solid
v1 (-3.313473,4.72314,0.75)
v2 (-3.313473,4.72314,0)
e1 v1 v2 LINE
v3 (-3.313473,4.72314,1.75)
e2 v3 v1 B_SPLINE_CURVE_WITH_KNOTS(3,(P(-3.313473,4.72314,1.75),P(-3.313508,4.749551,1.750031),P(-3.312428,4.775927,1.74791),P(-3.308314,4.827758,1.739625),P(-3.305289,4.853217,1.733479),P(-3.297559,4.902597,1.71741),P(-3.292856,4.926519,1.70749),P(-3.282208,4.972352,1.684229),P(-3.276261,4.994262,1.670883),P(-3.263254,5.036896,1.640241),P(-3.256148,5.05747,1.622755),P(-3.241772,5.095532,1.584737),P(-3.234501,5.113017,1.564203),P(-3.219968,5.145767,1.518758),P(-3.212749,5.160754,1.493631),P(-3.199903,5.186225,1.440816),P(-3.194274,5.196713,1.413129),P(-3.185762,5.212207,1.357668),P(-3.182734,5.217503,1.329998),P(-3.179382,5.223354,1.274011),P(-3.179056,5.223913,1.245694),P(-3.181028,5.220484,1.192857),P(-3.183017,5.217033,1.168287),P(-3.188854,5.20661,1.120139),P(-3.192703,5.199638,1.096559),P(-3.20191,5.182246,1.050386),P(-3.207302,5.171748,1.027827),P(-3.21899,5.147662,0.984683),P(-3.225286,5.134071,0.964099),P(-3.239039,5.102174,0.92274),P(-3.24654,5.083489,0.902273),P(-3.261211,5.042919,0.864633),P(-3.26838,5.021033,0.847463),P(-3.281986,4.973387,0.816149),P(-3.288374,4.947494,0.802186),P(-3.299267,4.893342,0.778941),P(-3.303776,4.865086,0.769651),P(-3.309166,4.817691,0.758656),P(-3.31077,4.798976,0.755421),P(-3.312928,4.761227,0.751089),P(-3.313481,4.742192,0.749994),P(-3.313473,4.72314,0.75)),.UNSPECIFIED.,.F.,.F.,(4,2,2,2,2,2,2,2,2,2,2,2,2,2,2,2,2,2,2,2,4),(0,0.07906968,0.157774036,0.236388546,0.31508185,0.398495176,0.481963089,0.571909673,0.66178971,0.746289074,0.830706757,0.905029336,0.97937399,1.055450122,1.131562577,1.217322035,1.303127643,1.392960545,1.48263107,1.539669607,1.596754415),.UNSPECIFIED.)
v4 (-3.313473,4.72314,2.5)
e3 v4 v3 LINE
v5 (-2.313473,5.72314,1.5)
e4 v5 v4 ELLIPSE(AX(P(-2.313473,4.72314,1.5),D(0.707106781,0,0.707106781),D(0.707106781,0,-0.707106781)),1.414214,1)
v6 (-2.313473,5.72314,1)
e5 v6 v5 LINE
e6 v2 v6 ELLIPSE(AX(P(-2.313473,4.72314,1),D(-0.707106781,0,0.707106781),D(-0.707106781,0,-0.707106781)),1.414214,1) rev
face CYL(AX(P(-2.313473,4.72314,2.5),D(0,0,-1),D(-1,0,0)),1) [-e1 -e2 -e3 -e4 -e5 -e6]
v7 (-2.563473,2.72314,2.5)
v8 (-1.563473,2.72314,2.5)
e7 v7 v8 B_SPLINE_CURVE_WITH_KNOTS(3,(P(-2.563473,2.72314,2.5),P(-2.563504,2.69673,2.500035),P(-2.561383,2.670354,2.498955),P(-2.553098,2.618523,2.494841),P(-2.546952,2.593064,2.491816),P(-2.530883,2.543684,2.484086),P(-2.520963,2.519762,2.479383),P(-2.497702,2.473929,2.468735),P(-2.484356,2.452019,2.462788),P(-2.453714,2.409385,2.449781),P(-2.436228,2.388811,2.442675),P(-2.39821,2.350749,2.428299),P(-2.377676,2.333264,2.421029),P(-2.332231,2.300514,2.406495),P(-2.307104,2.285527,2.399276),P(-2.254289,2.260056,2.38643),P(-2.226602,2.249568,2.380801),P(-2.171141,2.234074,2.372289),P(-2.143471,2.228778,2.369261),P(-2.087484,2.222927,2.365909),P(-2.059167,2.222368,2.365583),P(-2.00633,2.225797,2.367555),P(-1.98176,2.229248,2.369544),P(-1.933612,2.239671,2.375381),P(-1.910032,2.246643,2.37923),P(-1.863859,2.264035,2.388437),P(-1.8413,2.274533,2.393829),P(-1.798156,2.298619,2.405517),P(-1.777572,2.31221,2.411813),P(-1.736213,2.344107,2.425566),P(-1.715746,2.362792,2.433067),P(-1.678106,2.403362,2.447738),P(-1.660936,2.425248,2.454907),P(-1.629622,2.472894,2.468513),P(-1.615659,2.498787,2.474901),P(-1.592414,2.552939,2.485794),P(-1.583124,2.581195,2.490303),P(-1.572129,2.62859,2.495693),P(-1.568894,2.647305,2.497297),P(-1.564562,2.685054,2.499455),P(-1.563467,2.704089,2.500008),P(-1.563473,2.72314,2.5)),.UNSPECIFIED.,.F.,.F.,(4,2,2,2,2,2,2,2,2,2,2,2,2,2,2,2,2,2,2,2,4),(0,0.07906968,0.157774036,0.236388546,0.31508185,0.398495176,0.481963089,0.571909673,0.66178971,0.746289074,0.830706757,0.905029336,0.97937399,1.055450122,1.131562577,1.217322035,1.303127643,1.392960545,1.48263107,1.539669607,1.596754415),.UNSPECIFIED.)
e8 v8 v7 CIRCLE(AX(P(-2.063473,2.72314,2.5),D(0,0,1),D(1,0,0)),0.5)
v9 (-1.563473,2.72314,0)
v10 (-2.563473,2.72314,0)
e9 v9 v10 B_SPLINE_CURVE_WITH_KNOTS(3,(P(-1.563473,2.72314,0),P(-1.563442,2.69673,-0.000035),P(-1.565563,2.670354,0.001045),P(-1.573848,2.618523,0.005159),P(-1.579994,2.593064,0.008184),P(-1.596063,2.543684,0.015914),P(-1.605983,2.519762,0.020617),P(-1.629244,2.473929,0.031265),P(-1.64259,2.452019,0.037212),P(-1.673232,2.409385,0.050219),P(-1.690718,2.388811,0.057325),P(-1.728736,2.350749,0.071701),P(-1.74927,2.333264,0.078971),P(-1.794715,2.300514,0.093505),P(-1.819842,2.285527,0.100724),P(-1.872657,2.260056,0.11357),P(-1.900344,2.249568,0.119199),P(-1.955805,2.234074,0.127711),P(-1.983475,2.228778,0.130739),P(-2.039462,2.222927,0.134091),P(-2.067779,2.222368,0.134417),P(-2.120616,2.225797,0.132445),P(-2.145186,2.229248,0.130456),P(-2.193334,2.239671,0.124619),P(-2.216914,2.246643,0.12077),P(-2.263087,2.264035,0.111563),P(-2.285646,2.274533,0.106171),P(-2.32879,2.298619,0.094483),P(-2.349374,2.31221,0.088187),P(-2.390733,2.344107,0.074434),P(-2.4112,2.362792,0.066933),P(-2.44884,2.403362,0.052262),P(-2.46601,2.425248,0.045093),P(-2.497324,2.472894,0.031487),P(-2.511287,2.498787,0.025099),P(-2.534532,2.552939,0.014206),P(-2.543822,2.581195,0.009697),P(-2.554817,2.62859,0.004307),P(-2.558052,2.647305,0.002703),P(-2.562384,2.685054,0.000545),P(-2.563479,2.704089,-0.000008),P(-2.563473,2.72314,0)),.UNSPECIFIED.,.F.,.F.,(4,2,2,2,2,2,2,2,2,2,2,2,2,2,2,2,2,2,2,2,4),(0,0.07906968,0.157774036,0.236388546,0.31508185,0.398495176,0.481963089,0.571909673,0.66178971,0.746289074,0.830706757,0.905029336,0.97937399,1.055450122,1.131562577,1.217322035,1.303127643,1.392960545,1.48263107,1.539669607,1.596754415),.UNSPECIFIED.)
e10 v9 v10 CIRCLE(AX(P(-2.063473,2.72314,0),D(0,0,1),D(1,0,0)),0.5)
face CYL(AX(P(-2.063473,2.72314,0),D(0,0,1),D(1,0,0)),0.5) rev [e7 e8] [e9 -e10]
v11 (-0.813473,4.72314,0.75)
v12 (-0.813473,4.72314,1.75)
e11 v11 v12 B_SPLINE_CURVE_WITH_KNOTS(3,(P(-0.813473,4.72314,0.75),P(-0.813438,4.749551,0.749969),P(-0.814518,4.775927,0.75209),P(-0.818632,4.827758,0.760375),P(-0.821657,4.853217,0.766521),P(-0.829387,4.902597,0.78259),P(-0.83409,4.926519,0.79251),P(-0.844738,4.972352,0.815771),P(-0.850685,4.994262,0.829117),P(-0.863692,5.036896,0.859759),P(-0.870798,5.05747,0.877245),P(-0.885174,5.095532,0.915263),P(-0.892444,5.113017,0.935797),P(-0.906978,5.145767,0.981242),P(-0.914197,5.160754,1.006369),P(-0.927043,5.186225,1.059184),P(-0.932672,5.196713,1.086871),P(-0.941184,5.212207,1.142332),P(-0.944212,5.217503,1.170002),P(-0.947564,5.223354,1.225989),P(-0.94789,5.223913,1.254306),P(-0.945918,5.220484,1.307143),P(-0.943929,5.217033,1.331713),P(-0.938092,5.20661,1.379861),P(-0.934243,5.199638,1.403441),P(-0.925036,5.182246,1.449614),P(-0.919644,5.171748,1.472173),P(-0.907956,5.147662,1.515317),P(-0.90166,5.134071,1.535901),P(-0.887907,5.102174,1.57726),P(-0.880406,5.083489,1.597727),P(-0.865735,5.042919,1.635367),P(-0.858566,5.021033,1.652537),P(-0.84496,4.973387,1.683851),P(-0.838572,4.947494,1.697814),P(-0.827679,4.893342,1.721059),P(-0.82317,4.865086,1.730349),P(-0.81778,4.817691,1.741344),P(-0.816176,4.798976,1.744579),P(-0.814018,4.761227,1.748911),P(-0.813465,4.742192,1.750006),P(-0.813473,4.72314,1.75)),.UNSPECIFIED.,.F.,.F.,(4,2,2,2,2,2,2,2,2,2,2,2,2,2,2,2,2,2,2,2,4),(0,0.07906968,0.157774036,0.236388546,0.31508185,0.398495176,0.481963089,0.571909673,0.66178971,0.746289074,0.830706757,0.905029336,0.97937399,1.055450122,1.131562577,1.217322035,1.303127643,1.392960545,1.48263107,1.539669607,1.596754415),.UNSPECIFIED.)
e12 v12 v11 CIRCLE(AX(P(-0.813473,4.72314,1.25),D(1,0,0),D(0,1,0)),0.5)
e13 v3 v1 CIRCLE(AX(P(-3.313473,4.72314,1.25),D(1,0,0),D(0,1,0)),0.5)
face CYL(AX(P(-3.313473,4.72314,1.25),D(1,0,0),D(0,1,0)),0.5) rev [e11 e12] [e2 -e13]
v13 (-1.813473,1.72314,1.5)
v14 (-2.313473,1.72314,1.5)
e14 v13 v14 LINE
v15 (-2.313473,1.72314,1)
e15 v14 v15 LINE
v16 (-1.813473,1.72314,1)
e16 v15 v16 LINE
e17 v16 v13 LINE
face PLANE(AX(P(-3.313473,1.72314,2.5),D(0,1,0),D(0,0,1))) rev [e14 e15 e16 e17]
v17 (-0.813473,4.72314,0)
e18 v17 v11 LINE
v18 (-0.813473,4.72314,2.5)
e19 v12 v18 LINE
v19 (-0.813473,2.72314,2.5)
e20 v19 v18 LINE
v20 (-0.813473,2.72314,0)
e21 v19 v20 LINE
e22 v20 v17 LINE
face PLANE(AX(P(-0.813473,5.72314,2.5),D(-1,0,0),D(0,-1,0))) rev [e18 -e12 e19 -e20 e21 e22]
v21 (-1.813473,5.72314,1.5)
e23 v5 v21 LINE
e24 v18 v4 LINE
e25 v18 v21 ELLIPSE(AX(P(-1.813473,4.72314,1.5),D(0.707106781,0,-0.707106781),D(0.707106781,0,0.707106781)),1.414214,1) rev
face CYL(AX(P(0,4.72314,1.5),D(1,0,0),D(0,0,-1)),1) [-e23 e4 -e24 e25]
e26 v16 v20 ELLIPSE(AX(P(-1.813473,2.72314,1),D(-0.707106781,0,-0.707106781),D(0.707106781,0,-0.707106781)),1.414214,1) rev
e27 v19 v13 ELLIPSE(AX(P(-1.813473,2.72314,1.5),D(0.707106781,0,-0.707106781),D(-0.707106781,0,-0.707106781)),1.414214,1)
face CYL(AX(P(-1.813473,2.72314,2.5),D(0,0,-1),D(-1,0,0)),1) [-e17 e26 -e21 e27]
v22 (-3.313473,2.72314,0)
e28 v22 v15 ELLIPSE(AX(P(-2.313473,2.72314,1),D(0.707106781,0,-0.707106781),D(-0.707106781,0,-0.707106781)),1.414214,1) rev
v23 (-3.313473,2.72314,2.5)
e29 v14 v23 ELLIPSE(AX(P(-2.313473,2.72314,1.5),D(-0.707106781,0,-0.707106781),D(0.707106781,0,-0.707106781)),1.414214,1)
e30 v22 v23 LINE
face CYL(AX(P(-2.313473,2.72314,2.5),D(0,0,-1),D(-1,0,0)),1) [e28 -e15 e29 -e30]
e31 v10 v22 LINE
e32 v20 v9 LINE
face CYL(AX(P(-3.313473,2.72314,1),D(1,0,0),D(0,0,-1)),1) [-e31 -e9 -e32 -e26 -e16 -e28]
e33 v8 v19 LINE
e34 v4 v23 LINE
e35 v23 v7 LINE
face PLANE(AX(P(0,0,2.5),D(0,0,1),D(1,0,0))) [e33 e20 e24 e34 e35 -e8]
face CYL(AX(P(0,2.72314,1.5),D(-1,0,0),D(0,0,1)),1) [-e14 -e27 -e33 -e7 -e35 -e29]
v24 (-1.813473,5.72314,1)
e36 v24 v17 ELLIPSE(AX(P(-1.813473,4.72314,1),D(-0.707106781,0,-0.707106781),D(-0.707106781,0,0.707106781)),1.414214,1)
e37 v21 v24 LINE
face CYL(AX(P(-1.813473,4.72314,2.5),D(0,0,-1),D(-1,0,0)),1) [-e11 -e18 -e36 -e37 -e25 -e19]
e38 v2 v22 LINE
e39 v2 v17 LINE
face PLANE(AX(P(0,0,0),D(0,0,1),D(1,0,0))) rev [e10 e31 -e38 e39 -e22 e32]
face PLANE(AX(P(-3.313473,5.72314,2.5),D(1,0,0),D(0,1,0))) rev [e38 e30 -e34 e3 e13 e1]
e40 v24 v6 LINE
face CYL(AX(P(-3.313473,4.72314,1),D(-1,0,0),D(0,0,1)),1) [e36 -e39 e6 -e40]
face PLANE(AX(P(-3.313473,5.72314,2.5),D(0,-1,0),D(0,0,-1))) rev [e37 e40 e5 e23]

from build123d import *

# Parameters (mm, degrees)
CROQUIS1_W              = 2.5
CROQUIS1_H              = 4
SALIENTE_EXTRUIR1_DEPTH = 2.5
REDONDEO1_R             = 1
CROQUIS2_R              = 0.5
CORTAR_EXTRUIR1_DEPTH   = 2.5
CROQUIS4_R              = 0.5
CORTAR_EXTRUIR2_DEPTH   = 2.5
REDONDEO2_R             = 1
REDONDEO3_R             = 1


with BuildPart() as part:
    # Croquis1 → Saliente-Extruir1 (new body)
    with BuildSketch(Plane.XY):
        with Locations((-2.063472996, 3.723140496)):
            Rectangle(CROQUIS1_W, CROQUIS1_H)
    extrude(amount=SALIENTE_EXTRUIR1_DEPTH)

    # Redondeo1
    redondeo1_edges = [part.edges().sort_by_distance(p)[0] for p in [
        (-2.063472996, 5.723140496, 2.5),
        (-2.063472996, 5.723140496, 0),
        (-0.813472996, 1.723140496, 1.25),
        (-3.313472996, 1.723140496, 1.25),
    ]]
    fillet(redondeo1_edges, radius=REDONDEO1_R)

    # Croquis2 → Cortar-Extruir1 (cut)
    with BuildSketch(Plane(origin=(-0.813472996, 0, 0), x_dir=(0, 0, -1), z_dir=(1, 0, 0))):
        with Locations(Location((-1.25, 4.723140496, 0), (0, 0, 90))):
            Circle(CROQUIS2_R)
    extrude(amount=-CORTAR_EXTRUIR1_DEPTH, mode=Mode.SUBTRACT)

    # Croquis4 → Cortar-Extruir2 (cut)
    with BuildSketch(Plane.XY.offset(2.5)):
        with Locations((-2.063472996, 2.723140496)):
            Circle(CROQUIS4_R)
    extrude(amount=-CORTAR_EXTRUIR2_DEPTH, mode=Mode.SUBTRACT)

    # Redondeo2
    # the kernel refuses this fillet: 1 mm, written as the material it takes off along each edge
    with BuildSketch(Plane(origin=(-0.813472996, 5.723140496, -1.5), x_dir=(-1, 0, 0), z_dir=(0, 0, 1))) as redondeo2_piece_1:
        with BuildLine():
            CenterArc((REDONDEO2_R, REDONDEO2_R), REDONDEO2_R, 180, 90)
            Line((0, REDONDEO2_R), (0, 0))
            Line((0, 0), (REDONDEO2_R, 0))
        make_face()
    extrude(amount=5.5, mode=Mode.SUBTRACT)
    with BuildSketch(Plane(origin=(-3.313472996, 5.723140496, -1.5), x_dir=(1, 0, 0), z_dir=(0, 0, 1))) as redondeo2_piece_2:
        with BuildLine():
            CenterArc((REDONDEO2_R, -REDONDEO2_R), REDONDEO2_R, 90, 90)
            Line((0, -REDONDEO2_R), (0, 0))
            Line((0, 0), (REDONDEO2_R, 0))
        make_face()
    extrude(amount=5.5, mode=Mode.SUBTRACT)

    # Redondeo3
    # the kernel refuses this fillet: 1 mm, written as the material it takes off along each edge
    with BuildSketch(Plane(origin=(0.686527004, 1.723140496, 2.5), x_dir=(0, 1, 0), z_dir=(-1, 0, 0))) as redondeo3_piece_1:
        with BuildLine():
            CenterArc((REDONDEO3_R, REDONDEO3_R), REDONDEO3_R, 180, 90)
            Line((0, REDONDEO3_R), (0, 0))
            Line((0, 0), (REDONDEO3_R, 0))
        make_face()
    extrude(amount=5.5, mode=Mode.SUBTRACT)
    with BuildSketch(Plane(origin=(0.686527004, 1.723140496, 0), x_dir=(0, 1, 0), z_dir=(-1, 0, 0))) as redondeo3_piece_2:
        with BuildLine():
            CenterArc((REDONDEO3_R, -REDONDEO3_R), REDONDEO3_R, 90, 90)
            Line((0, -REDONDEO3_R), (0, 0))
            Line((0, 0), (REDONDEO3_R, 0))
        make_face()
    extrude(amount=5.5, mode=Mode.SUBTRACT)


solid = part.part
